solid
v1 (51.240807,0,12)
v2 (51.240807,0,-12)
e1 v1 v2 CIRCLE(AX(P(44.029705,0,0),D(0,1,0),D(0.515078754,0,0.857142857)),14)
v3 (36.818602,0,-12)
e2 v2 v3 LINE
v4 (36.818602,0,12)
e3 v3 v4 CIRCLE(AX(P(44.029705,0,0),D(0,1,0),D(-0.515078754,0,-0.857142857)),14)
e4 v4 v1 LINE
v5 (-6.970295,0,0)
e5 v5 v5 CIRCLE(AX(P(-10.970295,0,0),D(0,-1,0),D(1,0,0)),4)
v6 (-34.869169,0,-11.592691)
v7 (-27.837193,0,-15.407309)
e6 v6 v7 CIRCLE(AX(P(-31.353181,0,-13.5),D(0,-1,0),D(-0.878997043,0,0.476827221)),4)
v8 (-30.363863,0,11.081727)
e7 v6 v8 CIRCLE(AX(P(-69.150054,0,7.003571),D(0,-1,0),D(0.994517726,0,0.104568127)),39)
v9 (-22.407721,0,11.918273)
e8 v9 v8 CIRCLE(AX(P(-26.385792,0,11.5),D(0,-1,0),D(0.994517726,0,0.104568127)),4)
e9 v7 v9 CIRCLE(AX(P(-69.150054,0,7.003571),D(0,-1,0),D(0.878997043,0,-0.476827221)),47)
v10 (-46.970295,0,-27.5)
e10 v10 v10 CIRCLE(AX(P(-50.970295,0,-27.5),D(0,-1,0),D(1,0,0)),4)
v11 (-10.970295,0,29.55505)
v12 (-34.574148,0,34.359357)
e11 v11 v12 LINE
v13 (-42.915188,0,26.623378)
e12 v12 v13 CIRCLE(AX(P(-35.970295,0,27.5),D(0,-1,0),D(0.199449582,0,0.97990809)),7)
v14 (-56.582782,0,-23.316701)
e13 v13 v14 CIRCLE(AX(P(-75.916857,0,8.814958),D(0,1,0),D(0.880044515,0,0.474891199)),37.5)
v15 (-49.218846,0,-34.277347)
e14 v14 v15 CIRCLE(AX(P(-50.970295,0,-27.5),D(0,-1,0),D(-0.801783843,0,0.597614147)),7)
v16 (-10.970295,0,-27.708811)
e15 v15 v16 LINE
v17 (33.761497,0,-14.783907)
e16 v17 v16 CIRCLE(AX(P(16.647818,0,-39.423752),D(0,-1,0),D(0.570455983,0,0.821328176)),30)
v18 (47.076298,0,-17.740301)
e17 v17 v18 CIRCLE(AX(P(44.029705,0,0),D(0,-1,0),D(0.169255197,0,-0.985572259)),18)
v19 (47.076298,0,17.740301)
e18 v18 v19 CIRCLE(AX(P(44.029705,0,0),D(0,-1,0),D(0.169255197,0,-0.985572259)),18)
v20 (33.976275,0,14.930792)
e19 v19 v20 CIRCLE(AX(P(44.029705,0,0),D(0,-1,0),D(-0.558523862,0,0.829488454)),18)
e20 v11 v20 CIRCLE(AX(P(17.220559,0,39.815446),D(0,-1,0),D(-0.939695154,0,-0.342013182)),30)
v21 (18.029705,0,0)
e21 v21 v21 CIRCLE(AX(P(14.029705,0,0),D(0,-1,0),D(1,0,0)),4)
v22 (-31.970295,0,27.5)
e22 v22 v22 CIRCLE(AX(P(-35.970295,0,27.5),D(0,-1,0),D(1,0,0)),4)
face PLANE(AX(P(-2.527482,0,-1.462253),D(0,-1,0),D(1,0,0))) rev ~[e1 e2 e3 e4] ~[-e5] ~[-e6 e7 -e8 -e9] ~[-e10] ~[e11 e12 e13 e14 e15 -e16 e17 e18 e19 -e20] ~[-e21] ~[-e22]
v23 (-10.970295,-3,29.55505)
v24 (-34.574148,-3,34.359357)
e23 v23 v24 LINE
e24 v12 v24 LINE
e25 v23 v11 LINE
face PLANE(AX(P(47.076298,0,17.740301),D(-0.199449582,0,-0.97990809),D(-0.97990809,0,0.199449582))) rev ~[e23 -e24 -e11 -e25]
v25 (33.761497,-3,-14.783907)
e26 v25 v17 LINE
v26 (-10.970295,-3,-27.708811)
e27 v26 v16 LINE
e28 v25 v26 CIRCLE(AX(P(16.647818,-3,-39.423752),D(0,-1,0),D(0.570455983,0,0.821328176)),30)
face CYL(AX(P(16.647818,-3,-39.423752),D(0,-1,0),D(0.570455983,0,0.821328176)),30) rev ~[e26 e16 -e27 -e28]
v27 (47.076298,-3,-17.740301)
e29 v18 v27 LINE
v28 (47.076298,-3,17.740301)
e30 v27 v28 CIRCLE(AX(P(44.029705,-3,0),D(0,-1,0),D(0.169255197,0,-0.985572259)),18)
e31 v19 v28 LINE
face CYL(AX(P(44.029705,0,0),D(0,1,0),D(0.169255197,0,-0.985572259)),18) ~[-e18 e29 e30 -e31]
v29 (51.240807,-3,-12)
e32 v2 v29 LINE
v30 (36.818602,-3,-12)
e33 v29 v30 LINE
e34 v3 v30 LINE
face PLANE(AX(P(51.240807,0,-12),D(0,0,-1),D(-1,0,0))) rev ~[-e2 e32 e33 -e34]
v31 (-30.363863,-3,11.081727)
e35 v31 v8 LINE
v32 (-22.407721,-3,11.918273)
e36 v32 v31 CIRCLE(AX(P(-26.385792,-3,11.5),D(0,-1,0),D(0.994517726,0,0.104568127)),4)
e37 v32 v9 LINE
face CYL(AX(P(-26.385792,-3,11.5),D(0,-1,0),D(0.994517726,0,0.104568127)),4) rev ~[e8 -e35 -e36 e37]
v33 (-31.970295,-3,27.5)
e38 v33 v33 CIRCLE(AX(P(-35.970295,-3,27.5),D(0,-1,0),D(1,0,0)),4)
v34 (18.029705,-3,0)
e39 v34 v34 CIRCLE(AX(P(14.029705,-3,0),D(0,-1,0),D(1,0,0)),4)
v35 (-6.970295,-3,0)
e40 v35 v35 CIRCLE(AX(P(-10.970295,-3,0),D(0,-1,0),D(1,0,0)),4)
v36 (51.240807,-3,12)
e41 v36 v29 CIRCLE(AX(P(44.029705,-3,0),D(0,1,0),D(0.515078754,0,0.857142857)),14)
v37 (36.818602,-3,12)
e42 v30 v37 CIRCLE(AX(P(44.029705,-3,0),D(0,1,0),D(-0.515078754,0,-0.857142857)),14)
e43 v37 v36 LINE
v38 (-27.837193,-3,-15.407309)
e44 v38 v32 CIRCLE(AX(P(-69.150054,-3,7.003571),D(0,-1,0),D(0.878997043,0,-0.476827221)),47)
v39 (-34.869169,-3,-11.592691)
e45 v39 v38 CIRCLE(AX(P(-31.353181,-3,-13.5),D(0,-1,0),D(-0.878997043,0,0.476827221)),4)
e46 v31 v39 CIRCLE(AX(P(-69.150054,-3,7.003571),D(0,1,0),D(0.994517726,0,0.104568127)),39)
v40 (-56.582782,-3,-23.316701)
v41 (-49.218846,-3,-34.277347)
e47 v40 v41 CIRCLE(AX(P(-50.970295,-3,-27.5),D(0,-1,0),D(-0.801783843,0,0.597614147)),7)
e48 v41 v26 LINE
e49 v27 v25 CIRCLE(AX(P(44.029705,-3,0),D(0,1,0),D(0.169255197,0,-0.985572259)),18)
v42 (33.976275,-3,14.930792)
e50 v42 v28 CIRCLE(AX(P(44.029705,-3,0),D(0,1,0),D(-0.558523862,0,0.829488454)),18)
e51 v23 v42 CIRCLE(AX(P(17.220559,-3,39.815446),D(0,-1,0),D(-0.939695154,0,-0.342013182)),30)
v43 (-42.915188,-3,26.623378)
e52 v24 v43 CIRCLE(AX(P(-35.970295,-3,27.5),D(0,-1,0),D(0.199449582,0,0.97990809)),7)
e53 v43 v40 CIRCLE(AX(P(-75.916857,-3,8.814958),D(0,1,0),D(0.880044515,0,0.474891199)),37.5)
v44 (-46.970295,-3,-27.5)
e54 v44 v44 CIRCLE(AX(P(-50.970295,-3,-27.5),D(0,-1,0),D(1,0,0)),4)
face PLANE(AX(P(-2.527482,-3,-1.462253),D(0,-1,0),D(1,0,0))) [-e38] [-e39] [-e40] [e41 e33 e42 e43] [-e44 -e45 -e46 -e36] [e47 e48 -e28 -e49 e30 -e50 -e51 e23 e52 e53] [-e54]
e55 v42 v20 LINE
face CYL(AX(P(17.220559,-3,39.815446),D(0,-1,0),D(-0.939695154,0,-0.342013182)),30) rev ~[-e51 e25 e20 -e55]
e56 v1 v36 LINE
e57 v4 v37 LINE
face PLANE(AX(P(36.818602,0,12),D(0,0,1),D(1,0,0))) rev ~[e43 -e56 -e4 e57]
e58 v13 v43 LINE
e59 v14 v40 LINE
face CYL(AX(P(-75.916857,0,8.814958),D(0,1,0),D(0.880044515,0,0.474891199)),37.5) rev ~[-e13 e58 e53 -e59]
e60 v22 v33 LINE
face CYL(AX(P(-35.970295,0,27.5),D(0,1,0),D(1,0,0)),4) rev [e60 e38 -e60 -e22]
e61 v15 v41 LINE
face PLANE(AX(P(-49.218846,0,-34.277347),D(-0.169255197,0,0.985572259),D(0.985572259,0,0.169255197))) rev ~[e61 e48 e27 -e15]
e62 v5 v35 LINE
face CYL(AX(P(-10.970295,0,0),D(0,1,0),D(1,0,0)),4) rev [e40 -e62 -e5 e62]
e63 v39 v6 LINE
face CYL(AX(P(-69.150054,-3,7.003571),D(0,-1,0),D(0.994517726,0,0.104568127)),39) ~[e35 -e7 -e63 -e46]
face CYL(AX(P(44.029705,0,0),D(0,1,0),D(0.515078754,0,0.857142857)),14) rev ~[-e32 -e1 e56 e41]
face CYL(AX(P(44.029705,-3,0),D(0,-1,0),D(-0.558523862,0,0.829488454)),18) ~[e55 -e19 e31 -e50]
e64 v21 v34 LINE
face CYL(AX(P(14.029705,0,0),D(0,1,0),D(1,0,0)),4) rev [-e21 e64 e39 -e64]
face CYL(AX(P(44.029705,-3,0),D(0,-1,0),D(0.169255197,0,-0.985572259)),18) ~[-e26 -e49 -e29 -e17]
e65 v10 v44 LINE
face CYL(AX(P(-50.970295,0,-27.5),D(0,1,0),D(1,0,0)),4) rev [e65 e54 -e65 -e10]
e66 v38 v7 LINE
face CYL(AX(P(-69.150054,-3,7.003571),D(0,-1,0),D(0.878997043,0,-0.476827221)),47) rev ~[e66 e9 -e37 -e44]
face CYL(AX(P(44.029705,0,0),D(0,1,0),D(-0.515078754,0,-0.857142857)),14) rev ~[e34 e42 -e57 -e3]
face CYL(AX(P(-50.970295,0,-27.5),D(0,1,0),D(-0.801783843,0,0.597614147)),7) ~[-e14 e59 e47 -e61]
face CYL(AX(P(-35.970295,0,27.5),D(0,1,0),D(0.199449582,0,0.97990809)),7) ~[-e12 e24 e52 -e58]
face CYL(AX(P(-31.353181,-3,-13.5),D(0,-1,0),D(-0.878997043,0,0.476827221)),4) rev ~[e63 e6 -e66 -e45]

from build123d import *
from build123d import SkipClean  # not in build123d's __all__

# Parameters (mm, degrees)
F0_R     = 4
F1_DEPTH = 3
F3_DEPTH = 25


# Not quite as in the source:
# - a feature names something its author has since deleted; it is built from what else it names


with BuildPart() as f1:
    # F0 (on Front) → F1 (new body)
    with BuildSketch(Plane.XZ):
        with BuildLine():
            Line((47.076298262, 17.7403006666), (-34.5741482174, 34.3593566285))
            ThreePointArc((-34.5741482174, 34.3593566285), (-40.7303881594, 32.6323986455), (-42.9151879903, 26.6233784428))
            ThreePointArc((-42.9151879903, 26.6233784428), (-39.7469745445, -1.0840101596), (-56.5827821886, -23.3167009679))
            ThreePointArc((-56.5827821886, -23.3167009679), (-56.7807033092, -31.4037364957), (-49.2188462892, -34.2773465607))
            Line((-49.2188462892, -34.2773465607), (47.076298262, -17.7403006666))
            ThreePointArc((47.076298262, -17.7403006666), (62.0297047119, 0), (47.076298262, 17.7403006666))
        make_face()
        with Locations((-50.9702952881, -27.5)):
            Circle(F0_R, mode=Mode.SUBTRACT)
        with Locations((-10.9702952881, 0)):
            Circle(F0_R, mode=Mode.SUBTRACT)
        with Locations((-35.9702952881, 27.5)):
            Circle(F0_R, mode=Mode.SUBTRACT)
        with Locations((14.0297047119, 0)):
            Circle(F0_R, mode=Mode.SUBTRACT)
        with BuildLine():
            ThreePointArc((36.818602161, -12), (30.0297047119, 0), (36.818602161, 12))
            Line((36.818602161, 12), (51.2408072628, 12))
            ThreePointArc((51.2408072628, 12), (58.0297047119, 0), (51.2408072628, -12))
            Line((51.2408072628, -12), (36.818602161, -12))
        make_face(mode=Mode.SUBTRACT)
    extrude(amount=F1_DEPTH)

    # F2 (on face) → F3 (cut)
    with BuildSketch(Plane.XZ.offset(3)):
        with BuildLine():
            ThreePointArc((33.9762752, 14.9307921776), (40.2551488392, 17.5997934068), (47.076298262, 17.7403006666))
            Line((47.076298262, 17.7403006666), (-10.9702952881, 29.555050349))
            ThreePointArc((-10.9702952881, 29.555050349), (7.9384350476, 11.2875267012), (33.9762752, 14.9307921776))
        make_face()
        with BuildLine():
            ThreePointArc((47.076298262, -17.7403006666), (40.1280392566, -17.572051863), (33.7614970255, -14.7839071598))
            ThreePointArc((33.7614970255, -14.7839071598), (8.3202088026, -10.6027369585), (-10.9702952881, -27.7088113948))
            Line((-10.9702952881, -27.7088113948), (47.076298262, -17.7403006666))
        make_face()
        with BuildLine():
            ThreePointArc((-30.363862552, 11.08172749), (-30.8978419926, -0.5969747066), (-34.8691691907, -11.5926911146))
            ThreePointArc((-34.8691691907, -11.5926911146), (-33.2604899055, -17.0159881706), (-27.8371928496, -15.4073088854))
            ThreePointArc((-27.8371928496, -15.4073088854), (-23.0512344312, -2.1560609065), (-22.4077207465, 11.91827251))
            ThreePointArc((-22.4077207465, 11.91827251), (-26.8040641592, 15.4780709028), (-30.363862552, 11.08172749))
        make_face()
    with SkipClean():  # cleaning this boolean's faces spoils the solid; the shape is the same uncleaned
        extrude(amount=-F3_DEPTH, mode=Mode.SUBTRACT)


solid = f1.part
